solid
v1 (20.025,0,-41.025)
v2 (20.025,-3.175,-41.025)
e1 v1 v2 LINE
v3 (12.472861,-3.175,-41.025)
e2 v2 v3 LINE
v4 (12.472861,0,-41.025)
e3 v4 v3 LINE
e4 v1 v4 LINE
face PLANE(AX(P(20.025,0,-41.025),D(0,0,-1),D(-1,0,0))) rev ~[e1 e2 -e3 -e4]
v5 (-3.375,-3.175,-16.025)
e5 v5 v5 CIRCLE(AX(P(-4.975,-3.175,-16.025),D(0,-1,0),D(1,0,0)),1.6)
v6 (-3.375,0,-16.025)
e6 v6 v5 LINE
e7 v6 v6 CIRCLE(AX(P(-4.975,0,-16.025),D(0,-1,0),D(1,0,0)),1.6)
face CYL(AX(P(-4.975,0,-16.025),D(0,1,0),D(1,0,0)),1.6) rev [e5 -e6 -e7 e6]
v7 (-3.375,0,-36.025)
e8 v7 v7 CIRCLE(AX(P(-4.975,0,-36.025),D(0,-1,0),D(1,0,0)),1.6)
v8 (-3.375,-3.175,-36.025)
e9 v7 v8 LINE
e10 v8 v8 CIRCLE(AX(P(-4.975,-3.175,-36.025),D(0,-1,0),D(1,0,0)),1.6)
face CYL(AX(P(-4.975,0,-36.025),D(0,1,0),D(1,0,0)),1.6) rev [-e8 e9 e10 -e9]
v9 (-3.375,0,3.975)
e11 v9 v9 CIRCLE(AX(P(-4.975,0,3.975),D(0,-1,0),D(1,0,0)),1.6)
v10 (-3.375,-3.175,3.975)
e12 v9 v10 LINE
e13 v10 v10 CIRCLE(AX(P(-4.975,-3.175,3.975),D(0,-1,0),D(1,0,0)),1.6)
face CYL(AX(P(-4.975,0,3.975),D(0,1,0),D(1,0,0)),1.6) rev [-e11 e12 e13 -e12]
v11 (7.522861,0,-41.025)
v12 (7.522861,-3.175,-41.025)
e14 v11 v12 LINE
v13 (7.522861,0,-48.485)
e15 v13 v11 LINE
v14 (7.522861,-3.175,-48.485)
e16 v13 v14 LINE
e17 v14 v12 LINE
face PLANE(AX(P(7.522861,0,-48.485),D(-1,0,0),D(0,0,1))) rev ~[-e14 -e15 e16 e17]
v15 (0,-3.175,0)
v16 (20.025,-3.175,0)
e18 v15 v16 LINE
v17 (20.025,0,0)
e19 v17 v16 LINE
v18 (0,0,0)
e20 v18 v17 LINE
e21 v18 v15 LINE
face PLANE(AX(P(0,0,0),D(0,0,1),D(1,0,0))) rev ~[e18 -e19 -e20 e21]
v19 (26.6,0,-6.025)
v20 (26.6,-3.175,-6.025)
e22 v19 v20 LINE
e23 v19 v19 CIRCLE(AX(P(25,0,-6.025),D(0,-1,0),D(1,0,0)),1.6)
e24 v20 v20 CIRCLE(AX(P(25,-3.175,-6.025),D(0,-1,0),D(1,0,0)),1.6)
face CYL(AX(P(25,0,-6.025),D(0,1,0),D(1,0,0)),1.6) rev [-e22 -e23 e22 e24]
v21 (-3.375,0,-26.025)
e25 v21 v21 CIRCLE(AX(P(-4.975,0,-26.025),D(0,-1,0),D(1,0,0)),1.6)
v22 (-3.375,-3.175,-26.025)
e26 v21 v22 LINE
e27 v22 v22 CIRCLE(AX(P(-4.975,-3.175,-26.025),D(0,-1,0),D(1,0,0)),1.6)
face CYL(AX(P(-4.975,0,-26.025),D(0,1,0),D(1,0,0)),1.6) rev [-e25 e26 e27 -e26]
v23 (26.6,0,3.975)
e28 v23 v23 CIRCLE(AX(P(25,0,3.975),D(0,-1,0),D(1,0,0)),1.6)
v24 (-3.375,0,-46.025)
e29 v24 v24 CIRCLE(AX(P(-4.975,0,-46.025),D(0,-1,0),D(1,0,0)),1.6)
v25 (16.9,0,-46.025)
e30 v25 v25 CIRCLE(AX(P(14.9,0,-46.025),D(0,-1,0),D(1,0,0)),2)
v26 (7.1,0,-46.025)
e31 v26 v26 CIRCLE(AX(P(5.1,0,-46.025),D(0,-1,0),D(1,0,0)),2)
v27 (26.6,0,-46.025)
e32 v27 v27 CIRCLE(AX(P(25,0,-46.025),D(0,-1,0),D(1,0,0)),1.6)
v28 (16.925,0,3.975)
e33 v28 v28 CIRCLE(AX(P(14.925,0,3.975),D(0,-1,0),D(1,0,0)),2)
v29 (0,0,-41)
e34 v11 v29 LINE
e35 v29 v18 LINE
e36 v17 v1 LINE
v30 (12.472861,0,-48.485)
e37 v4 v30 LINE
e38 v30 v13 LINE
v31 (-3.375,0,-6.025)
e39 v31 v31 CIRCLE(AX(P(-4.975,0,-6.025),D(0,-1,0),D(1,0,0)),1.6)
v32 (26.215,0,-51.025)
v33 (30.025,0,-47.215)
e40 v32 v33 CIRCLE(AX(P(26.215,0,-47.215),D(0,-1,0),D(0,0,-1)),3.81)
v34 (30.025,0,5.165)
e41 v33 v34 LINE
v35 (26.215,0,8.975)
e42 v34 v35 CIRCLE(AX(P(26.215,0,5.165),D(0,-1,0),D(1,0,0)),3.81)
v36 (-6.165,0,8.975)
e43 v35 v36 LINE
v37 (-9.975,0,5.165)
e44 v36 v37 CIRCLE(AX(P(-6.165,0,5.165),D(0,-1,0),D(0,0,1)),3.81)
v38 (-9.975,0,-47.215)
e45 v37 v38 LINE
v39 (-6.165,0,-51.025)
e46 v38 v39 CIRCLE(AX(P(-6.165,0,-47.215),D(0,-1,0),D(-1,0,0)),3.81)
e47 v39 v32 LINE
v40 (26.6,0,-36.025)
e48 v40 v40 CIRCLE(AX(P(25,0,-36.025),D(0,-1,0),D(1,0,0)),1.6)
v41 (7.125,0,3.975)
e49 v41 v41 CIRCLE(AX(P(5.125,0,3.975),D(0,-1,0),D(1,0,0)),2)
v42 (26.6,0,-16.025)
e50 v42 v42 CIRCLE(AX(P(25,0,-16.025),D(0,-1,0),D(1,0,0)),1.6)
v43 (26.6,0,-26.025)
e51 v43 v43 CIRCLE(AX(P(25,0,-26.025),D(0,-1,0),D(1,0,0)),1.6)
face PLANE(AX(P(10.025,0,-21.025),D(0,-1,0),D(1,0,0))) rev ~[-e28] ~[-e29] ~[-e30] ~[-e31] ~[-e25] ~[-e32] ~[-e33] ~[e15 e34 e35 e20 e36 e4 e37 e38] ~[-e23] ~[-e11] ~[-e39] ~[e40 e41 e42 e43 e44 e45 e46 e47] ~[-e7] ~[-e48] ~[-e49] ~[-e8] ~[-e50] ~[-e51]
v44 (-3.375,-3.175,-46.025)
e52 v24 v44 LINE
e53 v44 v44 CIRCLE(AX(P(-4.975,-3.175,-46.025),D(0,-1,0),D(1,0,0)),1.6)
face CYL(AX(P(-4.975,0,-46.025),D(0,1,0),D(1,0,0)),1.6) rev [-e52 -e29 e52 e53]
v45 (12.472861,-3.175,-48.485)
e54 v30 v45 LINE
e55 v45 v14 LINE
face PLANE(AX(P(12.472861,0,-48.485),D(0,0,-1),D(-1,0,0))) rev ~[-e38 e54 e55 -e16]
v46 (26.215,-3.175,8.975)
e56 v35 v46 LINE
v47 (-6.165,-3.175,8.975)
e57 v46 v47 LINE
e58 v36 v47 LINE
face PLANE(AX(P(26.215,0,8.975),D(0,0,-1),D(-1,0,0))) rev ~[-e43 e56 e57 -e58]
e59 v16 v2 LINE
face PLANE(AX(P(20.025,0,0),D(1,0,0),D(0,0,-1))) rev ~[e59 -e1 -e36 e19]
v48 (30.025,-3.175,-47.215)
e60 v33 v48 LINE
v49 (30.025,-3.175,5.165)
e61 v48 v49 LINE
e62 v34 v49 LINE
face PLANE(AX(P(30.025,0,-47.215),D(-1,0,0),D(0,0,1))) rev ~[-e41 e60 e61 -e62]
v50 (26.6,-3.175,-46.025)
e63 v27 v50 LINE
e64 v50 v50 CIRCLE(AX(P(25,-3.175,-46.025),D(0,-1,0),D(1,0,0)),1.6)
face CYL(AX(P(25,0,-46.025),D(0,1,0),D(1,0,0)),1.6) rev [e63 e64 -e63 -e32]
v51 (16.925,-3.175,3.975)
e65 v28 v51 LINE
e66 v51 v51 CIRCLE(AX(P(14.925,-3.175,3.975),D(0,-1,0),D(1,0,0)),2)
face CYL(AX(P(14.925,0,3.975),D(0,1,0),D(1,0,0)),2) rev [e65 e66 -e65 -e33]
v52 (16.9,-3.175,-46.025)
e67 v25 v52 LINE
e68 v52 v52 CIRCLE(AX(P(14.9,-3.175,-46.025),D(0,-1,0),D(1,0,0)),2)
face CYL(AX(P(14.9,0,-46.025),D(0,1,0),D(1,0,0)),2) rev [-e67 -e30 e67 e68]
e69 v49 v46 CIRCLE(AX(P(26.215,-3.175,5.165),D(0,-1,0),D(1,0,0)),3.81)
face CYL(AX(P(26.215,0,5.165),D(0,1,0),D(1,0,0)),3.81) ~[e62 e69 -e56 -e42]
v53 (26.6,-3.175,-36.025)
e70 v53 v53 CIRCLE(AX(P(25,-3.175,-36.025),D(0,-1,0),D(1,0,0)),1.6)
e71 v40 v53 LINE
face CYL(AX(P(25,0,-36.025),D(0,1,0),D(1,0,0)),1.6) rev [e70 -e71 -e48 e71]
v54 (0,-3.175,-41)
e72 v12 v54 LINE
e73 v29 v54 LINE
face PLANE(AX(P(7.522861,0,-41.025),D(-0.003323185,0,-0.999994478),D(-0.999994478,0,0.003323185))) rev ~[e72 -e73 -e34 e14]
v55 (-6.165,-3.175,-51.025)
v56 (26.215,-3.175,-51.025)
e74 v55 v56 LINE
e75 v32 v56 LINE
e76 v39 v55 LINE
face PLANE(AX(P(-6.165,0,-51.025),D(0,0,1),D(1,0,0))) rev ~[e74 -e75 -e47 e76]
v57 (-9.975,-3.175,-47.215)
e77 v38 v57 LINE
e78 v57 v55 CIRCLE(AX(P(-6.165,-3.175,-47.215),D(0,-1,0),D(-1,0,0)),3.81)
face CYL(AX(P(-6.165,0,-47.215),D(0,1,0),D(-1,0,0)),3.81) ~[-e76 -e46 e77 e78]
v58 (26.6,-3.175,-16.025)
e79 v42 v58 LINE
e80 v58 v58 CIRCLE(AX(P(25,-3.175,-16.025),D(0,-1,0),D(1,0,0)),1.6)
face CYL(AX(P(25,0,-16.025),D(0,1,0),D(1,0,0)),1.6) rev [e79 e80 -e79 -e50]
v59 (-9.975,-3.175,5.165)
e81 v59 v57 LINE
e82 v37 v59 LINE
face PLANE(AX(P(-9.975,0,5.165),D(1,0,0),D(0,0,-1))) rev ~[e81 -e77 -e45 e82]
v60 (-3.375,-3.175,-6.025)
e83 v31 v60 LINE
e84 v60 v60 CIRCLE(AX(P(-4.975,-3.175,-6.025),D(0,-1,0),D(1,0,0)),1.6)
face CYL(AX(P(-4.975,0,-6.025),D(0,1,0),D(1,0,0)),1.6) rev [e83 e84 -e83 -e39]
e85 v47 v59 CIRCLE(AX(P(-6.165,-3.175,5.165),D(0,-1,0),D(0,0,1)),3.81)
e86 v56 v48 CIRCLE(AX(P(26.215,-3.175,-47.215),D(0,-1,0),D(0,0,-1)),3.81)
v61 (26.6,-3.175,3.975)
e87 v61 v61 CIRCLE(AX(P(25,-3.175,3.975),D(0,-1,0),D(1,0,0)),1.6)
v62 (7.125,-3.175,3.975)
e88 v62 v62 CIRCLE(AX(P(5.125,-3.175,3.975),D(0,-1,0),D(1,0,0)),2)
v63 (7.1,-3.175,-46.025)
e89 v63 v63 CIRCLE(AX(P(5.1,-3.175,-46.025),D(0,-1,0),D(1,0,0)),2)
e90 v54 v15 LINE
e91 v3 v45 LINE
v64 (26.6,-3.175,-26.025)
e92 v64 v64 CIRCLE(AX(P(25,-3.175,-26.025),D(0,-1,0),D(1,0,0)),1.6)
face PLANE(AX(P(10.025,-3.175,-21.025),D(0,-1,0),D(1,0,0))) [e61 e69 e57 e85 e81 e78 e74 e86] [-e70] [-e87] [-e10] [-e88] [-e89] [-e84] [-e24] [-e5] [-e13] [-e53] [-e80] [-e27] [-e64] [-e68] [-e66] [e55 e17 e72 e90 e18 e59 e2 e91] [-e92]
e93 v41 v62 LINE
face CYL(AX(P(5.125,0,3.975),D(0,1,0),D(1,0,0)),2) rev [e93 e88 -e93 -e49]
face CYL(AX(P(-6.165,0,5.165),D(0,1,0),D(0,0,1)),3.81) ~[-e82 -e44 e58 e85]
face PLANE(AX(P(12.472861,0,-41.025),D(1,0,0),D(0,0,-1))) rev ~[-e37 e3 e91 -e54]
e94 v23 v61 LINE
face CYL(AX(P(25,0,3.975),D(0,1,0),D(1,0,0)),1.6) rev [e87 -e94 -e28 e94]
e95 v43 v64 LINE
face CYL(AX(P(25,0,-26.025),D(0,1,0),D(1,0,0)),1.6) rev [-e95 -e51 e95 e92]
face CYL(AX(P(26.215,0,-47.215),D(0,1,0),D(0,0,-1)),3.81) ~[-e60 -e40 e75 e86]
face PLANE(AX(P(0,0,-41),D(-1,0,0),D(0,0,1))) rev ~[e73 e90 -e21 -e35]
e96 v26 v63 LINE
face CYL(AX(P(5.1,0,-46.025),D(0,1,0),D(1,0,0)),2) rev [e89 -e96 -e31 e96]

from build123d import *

# Parameters (mm, degrees)
F0_R     = 1.6
F0_R_2   = 2
F1_DEPTH = 3.175


# Not quite as in the source:
# - a length typed as a fraction of an inch, garbled in the dataset ("3 / 203.2 mm" for 3/8 in), is restored


with BuildPart() as f1:
    # F0 (on Front) → F1 (new body)
    with BuildSketch(Plane.XZ):
        with BuildLine():
            Line((26.215, 8.975), (-6.165, 8.975))
            ThreePointArc((-6.165, 8.975), (-8.8590768363, 7.8590768363), (-9.975, 5.165))
            Line((-9.975, 5.165), (-9.975, -47.215))
            ThreePointArc((-9.975, -47.215), (-8.8590768363, -49.9090768363), (-6.165, -51.025))
            Line((-6.165, -51.025), (26.215, -51.025))
            ThreePointArc((26.215, -51.025), (28.9090768363, -49.9090768363), (30.025, -47.215))
            Line((30.025, -47.215), (30.025, 5.165))
            ThreePointArc((30.025, 5.165), (28.9090768363, 7.8590768363), (26.215, 8.975))
        make_face()
        with Locations((-4.975, -46.025)):
            Circle(F0_R, mode=Mode.SUBTRACT)
        with Locations((5.1, -46.025)):
            Circle(F0_R_2, mode=Mode.SUBTRACT)
        with Locations((-4.975, -36.025)):
            Circle(F0_R, mode=Mode.SUBTRACT)
        with Locations((-4.975, -26.025)):
            Circle(F0_R, mode=Mode.SUBTRACT)
        Polygon((0, -41), (0, 0), (20.025, 0), (20.025, -41.025), (12.4728614733, -41.025), (12.4728614733, -48.485), (7.5228614733, -48.485), (7.5228614733, -41.025), align=None, mode=Mode.SUBTRACT)
        with Locations((14.9, -46.025)):
            Circle(F0_R_2, mode=Mode.SUBTRACT)
        with Locations((25, -46.025)):
            Circle(F0_R, mode=Mode.SUBTRACT)
        with Locations((25, -36.025)):
            Circle(F0_R, mode=Mode.SUBTRACT)
        with Locations((25, -26.025)):
            Circle(F0_R, mode=Mode.SUBTRACT)
        with Locations((-4.975, -16.025)):
            Circle(F0_R, mode=Mode.SUBTRACT)
        with Locations((-4.975, -6.025)):
            Circle(F0_R, mode=Mode.SUBTRACT)
        with Locations((-4.975, 3.975)):
            Circle(F0_R, mode=Mode.SUBTRACT)
        with Locations((5.125, 3.975)):
            Circle(F0_R_2, mode=Mode.SUBTRACT)
        with Locations((25, -16.025)):
            Circle(F0_R, mode=Mode.SUBTRACT)
        with Locations((14.925, 3.975)):
            Circle(F0_R_2, mode=Mode.SUBTRACT)
        with Locations((25, -6.025)):
            Circle(F0_R, mode=Mode.SUBTRACT)
        with Locations((25, 3.975)):
            Circle(F0_R, mode=Mode.SUBTRACT)
    extrude(amount=F1_DEPTH)


solid = f1.part
